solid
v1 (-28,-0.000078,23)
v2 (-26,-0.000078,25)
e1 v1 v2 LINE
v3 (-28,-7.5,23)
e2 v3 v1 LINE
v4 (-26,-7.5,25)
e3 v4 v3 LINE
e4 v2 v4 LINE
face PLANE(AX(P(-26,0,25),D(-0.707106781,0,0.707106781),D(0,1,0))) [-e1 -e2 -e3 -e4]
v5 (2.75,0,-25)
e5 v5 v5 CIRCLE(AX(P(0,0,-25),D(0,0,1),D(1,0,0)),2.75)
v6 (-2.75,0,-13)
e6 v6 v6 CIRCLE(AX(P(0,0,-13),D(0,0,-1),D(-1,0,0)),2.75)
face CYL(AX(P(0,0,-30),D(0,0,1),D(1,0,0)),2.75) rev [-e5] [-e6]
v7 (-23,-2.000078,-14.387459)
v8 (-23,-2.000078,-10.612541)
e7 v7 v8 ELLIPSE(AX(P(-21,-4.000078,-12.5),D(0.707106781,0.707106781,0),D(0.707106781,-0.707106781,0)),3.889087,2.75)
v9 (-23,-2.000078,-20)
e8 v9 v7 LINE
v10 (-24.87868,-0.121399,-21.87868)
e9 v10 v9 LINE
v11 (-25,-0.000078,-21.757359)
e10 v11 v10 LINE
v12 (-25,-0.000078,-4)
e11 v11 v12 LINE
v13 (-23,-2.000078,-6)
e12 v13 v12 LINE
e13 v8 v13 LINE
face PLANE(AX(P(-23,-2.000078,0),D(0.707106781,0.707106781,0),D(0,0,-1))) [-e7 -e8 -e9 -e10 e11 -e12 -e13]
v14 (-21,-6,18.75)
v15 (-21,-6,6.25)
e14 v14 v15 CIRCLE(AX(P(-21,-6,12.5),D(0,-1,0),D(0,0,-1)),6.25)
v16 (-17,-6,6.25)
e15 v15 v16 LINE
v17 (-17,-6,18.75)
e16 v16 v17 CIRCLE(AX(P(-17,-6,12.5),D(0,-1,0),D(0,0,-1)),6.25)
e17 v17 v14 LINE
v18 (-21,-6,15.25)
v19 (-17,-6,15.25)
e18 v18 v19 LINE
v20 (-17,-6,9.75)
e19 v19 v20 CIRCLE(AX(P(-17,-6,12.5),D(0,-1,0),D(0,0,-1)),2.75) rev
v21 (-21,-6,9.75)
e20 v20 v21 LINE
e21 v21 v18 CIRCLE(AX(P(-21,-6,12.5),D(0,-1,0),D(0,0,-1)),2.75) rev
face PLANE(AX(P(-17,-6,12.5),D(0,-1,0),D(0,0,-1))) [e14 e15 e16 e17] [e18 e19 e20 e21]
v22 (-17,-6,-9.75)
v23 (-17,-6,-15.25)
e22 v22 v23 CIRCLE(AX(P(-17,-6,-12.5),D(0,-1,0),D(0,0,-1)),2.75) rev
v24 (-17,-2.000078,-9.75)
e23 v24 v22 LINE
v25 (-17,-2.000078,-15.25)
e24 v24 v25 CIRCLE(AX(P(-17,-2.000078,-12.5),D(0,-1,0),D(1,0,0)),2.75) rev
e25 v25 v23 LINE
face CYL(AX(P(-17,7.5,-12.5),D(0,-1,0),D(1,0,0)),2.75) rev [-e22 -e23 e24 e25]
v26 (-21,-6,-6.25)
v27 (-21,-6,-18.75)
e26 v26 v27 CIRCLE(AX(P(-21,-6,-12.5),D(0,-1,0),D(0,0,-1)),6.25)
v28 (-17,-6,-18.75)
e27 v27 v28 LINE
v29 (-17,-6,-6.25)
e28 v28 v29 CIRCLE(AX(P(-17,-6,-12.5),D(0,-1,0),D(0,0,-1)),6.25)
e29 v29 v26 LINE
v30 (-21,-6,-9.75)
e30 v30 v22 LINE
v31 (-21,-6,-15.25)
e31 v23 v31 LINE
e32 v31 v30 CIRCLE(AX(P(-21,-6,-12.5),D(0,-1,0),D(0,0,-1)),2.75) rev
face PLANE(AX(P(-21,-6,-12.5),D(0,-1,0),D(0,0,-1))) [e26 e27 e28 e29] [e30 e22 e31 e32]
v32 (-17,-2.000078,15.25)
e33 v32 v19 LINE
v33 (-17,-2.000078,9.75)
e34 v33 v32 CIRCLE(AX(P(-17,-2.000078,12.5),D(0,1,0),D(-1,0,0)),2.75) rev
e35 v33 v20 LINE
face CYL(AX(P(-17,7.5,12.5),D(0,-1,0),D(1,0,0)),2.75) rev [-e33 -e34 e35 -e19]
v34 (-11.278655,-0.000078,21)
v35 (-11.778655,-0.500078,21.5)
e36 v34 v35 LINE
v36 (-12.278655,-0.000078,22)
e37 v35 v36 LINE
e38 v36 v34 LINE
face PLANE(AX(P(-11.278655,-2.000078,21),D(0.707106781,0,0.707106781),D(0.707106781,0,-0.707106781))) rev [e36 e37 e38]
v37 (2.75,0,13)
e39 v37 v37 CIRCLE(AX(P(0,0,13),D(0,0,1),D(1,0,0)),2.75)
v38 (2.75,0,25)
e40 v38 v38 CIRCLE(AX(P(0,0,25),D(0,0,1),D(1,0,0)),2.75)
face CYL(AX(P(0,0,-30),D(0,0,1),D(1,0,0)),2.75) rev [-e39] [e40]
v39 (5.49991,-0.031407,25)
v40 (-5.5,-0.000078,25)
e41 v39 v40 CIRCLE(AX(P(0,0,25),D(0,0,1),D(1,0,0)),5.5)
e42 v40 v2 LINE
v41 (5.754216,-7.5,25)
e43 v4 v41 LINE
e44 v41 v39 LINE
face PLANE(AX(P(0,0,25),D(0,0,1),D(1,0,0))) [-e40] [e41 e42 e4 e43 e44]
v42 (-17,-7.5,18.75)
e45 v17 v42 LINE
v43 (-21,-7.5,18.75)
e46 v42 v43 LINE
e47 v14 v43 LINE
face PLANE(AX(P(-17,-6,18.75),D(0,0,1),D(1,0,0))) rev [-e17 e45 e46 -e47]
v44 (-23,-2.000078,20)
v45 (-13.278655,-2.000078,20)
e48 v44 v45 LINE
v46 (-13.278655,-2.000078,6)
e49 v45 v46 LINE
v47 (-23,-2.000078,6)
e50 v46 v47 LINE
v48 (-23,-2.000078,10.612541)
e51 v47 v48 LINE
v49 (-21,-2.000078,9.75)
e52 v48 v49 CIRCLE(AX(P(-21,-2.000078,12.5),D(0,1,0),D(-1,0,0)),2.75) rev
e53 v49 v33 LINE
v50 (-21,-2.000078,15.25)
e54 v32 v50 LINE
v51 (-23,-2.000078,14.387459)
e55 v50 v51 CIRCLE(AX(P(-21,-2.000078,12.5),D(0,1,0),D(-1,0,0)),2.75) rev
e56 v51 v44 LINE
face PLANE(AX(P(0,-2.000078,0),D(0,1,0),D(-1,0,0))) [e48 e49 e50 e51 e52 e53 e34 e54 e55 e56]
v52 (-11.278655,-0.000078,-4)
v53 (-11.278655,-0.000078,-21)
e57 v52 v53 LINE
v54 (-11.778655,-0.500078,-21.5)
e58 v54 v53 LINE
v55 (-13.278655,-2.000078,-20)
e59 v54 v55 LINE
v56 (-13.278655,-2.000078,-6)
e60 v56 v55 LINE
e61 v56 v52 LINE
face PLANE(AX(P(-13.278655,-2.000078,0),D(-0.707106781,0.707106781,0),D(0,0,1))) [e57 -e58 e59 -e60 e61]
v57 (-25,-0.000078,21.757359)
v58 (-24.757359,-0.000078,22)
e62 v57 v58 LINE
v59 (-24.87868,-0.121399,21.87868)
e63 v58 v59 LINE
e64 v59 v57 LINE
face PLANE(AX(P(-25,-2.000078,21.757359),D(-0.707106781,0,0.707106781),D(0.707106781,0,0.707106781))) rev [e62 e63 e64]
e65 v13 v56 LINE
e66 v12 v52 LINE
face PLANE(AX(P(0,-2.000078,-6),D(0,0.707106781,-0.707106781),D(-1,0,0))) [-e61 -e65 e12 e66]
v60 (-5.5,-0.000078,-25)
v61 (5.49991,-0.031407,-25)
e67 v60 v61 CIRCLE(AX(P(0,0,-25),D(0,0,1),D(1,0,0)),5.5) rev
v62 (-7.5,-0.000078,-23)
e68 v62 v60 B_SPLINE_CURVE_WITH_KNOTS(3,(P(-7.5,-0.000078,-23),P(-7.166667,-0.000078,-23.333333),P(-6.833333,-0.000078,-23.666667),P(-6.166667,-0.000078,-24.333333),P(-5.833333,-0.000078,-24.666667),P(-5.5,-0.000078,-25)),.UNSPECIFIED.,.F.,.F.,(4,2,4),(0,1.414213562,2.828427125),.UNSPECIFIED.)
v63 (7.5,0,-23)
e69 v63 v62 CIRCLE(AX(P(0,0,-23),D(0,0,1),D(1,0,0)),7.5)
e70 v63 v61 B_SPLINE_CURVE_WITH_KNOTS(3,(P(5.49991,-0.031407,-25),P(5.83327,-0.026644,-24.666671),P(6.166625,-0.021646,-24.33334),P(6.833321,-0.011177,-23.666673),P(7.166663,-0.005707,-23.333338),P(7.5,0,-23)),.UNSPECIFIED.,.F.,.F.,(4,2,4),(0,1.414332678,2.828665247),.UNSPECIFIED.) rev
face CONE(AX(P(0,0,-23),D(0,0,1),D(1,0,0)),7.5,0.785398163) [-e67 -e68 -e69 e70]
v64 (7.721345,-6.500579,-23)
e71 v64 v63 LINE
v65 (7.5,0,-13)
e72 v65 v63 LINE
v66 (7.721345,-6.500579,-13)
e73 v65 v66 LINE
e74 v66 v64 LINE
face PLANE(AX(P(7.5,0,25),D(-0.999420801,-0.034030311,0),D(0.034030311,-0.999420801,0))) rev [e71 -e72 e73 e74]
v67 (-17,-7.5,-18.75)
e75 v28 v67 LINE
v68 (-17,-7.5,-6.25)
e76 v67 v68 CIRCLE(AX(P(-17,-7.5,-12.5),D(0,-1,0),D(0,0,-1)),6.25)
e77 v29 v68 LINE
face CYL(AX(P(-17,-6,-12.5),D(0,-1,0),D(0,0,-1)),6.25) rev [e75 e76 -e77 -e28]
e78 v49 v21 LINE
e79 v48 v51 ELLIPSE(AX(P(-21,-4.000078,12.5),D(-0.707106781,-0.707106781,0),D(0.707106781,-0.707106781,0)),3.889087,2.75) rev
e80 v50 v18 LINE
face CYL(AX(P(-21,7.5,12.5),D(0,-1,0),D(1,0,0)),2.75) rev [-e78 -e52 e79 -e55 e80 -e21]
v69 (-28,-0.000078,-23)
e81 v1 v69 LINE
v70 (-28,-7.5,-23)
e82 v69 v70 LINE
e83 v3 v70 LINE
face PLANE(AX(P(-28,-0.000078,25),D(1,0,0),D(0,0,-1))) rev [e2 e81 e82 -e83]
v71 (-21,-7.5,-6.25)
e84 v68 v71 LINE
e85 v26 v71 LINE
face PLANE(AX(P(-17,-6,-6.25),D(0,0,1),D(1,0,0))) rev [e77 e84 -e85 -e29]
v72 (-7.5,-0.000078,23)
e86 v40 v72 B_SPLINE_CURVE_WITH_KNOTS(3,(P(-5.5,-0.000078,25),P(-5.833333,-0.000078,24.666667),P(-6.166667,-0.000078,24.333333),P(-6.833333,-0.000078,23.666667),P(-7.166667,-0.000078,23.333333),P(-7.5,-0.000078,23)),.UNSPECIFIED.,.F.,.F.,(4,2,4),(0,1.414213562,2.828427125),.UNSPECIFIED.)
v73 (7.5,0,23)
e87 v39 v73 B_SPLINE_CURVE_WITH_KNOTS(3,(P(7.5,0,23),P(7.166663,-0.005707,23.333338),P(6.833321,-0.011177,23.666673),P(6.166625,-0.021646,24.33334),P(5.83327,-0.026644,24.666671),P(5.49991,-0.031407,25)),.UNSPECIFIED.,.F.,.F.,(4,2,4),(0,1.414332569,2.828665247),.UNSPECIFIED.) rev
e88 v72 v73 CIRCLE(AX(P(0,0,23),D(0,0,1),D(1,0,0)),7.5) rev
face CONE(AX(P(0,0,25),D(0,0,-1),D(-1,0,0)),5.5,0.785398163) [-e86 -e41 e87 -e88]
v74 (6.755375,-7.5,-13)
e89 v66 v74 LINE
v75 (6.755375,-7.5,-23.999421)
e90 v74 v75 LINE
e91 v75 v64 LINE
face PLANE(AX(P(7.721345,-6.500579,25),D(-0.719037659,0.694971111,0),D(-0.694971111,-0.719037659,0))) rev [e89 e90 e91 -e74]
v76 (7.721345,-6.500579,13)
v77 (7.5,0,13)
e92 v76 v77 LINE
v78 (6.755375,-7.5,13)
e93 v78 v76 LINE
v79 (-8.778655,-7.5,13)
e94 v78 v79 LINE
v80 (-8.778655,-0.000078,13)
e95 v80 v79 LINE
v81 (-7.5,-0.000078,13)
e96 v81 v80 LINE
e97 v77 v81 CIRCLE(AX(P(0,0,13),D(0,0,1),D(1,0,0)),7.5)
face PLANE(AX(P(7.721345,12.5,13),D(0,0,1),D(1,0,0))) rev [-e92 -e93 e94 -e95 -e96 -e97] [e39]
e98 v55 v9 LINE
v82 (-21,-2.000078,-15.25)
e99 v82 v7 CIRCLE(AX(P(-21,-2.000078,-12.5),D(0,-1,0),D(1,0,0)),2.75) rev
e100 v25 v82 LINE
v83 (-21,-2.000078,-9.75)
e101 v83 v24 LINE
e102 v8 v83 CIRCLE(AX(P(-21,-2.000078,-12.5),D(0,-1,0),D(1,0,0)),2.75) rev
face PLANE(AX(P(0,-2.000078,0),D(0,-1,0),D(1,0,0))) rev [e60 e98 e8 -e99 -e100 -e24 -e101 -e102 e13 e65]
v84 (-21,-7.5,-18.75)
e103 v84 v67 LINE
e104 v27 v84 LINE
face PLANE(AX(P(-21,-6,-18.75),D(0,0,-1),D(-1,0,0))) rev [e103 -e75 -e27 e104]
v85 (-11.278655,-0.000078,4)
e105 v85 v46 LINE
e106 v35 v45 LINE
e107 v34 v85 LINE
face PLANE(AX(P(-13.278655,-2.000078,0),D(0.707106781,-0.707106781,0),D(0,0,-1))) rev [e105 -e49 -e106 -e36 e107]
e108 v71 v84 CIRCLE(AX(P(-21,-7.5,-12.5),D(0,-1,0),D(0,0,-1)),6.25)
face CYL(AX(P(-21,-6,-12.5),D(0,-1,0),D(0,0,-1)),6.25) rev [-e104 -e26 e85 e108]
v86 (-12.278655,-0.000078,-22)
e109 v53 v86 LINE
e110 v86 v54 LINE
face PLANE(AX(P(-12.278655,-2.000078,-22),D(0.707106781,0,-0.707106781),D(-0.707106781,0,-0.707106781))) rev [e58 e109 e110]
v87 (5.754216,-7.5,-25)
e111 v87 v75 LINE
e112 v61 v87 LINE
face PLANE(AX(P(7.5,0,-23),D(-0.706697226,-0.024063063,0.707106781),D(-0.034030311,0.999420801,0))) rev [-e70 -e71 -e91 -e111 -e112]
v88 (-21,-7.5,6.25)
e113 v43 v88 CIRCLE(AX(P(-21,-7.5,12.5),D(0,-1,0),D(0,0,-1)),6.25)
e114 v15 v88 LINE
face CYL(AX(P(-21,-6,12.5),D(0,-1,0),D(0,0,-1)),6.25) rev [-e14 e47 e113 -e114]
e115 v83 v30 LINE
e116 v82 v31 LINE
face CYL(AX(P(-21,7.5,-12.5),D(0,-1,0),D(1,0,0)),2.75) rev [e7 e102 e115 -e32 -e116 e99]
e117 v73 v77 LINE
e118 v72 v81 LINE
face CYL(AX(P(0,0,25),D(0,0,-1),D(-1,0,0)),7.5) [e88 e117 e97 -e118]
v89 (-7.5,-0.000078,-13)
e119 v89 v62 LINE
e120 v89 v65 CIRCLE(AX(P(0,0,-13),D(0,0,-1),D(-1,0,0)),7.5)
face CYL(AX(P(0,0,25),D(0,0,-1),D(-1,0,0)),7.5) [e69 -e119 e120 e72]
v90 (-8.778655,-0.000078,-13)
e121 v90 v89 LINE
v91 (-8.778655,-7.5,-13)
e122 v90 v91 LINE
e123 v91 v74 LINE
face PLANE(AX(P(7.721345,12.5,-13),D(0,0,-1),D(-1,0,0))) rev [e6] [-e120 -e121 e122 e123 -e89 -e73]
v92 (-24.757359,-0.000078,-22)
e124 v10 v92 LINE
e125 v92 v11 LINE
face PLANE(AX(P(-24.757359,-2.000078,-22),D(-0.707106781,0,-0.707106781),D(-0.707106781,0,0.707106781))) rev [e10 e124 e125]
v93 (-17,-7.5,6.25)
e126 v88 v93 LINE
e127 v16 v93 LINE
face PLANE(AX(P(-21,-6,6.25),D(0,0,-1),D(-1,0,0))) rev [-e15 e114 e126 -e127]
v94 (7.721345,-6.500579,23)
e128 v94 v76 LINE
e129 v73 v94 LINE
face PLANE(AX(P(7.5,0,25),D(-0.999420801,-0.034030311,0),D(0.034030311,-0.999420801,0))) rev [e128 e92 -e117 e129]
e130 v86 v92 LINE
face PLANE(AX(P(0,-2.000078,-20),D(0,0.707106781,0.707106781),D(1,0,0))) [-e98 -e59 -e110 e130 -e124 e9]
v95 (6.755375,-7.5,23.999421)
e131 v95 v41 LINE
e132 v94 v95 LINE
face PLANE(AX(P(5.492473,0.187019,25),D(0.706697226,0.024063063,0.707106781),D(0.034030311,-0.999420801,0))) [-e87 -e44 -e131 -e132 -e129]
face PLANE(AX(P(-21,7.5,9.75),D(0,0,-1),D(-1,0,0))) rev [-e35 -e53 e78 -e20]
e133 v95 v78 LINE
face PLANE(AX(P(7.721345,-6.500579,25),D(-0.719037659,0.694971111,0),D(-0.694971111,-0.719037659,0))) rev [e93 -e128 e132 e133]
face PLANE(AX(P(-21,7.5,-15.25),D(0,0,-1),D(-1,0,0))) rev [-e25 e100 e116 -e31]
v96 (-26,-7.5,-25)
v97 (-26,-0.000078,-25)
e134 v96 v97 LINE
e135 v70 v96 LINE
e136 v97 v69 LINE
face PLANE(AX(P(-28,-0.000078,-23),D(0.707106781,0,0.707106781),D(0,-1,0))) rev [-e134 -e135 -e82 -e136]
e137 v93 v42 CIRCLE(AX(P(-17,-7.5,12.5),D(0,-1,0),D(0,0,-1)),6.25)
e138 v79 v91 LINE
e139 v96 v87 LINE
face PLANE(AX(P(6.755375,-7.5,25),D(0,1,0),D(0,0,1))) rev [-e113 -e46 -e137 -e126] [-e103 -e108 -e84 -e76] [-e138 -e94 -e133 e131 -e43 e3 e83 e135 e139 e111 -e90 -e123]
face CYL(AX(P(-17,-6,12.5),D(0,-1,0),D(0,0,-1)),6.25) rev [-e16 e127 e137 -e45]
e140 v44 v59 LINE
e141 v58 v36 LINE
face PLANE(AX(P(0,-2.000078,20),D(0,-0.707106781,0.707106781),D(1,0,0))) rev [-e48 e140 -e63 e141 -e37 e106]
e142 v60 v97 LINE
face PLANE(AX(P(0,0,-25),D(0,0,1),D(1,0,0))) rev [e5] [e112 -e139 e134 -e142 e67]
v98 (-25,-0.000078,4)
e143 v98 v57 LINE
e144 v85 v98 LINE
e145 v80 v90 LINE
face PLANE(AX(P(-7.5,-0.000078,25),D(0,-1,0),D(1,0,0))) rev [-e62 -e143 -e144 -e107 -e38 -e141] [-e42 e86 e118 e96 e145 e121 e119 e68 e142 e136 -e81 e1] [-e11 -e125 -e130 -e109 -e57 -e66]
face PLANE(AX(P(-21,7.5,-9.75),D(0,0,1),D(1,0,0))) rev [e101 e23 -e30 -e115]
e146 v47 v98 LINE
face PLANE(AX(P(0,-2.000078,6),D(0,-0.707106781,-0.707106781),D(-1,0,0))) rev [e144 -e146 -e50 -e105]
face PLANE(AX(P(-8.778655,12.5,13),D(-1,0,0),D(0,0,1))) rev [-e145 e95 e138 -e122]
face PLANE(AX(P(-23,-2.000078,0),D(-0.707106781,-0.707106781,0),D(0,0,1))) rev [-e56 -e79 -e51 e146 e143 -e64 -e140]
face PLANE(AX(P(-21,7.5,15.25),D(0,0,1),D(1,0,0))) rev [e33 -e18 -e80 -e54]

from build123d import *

# Parameters (mm, degrees)
BOSS_EXTRUDE1_DEPTH = 25
MOUNT_HOLES_DEPTH   = 41.422765863
SKETCH7_W           = 16.5
SKETCH7_H           = 26
CUT_PART_DEPTH      = 20
AXIS_R              = 2.75
CUT_EXTRUDE3_DEPTH  = 30
CUT_EXTRUDE4_DEPTH  = 1.5
CUT_EXTRUDE5_DEPTH  = 2
CHAMFER2_SIZE       = 2


with BuildPart() as part:
    # contour → Boss-Extrude1 (new, symmetric)
    with BuildSketch(Plane.XY):
        with BuildLine():
            Line((7.5, 0), (7.721344931, -6.500579199))
            Line((7.721344931, -6.500579199), (6.755375242, -7.5))
            Line((6.755375242, -7.5), (0, -7.5))
            Line((0, -7.5), (-28, -7.5))
            Line((-28, -7.5), (-28, -7.827e-05))
            Line((-28, -7.827e-05), (-7.5, -7.827e-05))
            ThreePointArc((-7.5, -7.827e-05), (-3.9135e-05, 7.5), (7.5, 0))
        make_face()
    extrude(amount=BOSS_EXTRUDE1_DEPTH, both=True)

    # Sketch6 → mount-holes (cut, through all)
    with BuildSketch(Plane.XZ.offset(7.5)):
        with BuildLine():
            Line((-21, 15.25), (-17, 15.25))
            ThreePointArc((-17, 15.25), (-14.25, 12.5), (-17, 9.75))
            Line((-17, 9.75), (-21, 9.75))
            ThreePointArc((-21, 9.75), (-23.75, 12.5), (-21, 15.25))
        make_face()
        with BuildLine():
            Line((-21, -9.75), (-17, -9.75))
            ThreePointArc((-17, -9.75), (-14.25, -12.5), (-17, -15.25))
            Line((-17, -15.25), (-21, -15.25))
            ThreePointArc((-21, -15.25), (-23.75, -12.5), (-21, -9.75))
        make_face()
    extrude(amount=-MOUNT_HOLES_DEPTH, mode=Mode.SUBTRACT)

    # Sketch7 → cut-part (cut)
    with BuildSketch(Plane.XZ.offset(7.5)):
        with Locations((-0.528655069, 0)):
            Rectangle(SKETCH7_W, SKETCH7_H)
    extrude(amount=-CUT_PART_DEPTH, mode=Mode.SUBTRACT)

    # axis → Cut-Extrude3 (cut, symmetric)
    with BuildSketch(Plane.XY):
        Circle(AXIS_R)
    extrude(amount=CUT_EXTRUDE3_DEPTH, both=True, mode=Mode.SUBTRACT)

    # Sketch9 → Cut-Extrude4 (cut)
    with BuildSketch(Plane.XZ.offset(7.5)):
        with BuildLine():
            Line((-17, 18.75), (-21, 18.75))
            ThreePointArc((-21, 18.75), (-27.25, 12.5), (-21, 6.25))
            Line((-21, 6.25), (-17, 6.25))
            ThreePointArc((-17, 6.25), (-10.75, 12.5), (-17, 18.75))
        make_face()
        with BuildLine():
            Line((-21, -18.75), (-17, -18.75))
            ThreePointArc((-17, -18.75), (-10.75, -12.5), (-17, -6.25))
            Line((-17, -6.25), (-21, -6.25))
            ThreePointArc((-21, -6.25), (-27.25, -12.5), (-21, -18.75))
        make_face()
    extrude(amount=-CUT_EXTRUDE4_DEPTH, mode=Mode.SUBTRACT)

    # Chamfer1
    # the kernel refuses this chamfer: 2 mm, written as the material it takes off along each edge
    with BuildSketch(Plane(origin=(7.324969659, 5.140386945, -25), x_dir=(0.027479951033163995, 0.0009356932186842305, 0.9996219169112968), z_dir=(0.03403031050568426, -0.9994208012478462, 0))) as chamfer1_piece_1_section:
        with BuildLine():
            Line((2.05734639, 0), (-0.11309431, 2.054235587))
            Line((-0.11309431, 2.054235587), (-0.153079186, 2.053135752))
            ThreePointArc((-0.153079186, 2.053135752), (-0.068258454, 1.026795659), (-0.039984877, -0.001099835))
            Line((-0.039984877, -0.001099835), (0.001099835, -0.039984877))
            ThreePointArc((0.001099835, -0.039984877), (1.028995329, -0.011711299), (2.058446225, -0.039984877))
            Line((2.058446225, -0.039984877), (2.05734639, 0))
        make_face()
    chamfer1_piece_1 = extrude(amount=16.79107846, mode=Mode.PRIVATE)
    chamfer1_piece_1 = split(chamfer1_piece_1, bisect_by=Plane(origin=(7.719880972, -6.502093854, -23.313005801), z_dir=(-0.7190376591339585, 0.6949711107284657, 0)), keep=Keep.TOP, mode=Mode.PRIVATE)
    add(chamfer1_piece_1, mode=Mode.SUBTRACT)
    with BuildSketch(Plane(origin=(7.324969659, 5.140386945, 25), x_dir=(-0.9990429371443961, -0.03401744422077874, 0.027495876610585647), z_dir=(0.03403031050568426, -0.9994208012478462, 0))) as chamfer1_piece_2_section:
        with BuildLine():
            Line((2.05734639, 0), (-0.11309431, 2.054235587))
            Line((-0.11309431, 2.054235587), (-0.153079186, 2.053135752))
            ThreePointArc((-0.153079186, 2.053135752), (-0.068258454, 1.026795659), (-0.039984877, -0.001099835))
            Line((-0.039984877, -0.001099835), (0.001099835, -0.039984877))
            ThreePointArc((0.001099835, -0.039984877), (1.028995329, -0.011711299), (2.058446225, -0.039984877))
            Line((2.058446225, -0.039984877), (2.05734639, 0))
        make_face()
    chamfer1_piece_2 = extrude(amount=16.79107846, mode=Mode.PRIVATE)
    chamfer1_piece_2 = split(chamfer1_piece_2, bisect_by=Plane(origin=(10.54505629, -3.579083939, 24.461957422), z_dir=(-0.7190376591339585, 0.6949711107284657, 0)), keep=Keep.TOP, mode=Mode.PRIVATE)
    add(chamfer1_piece_2, mode=Mode.SUBTRACT)
    with BuildSketch(Plane(origin=(-28, -7.5, -25), x_dir=(0.9996219169112968, 0, -0.027495876610585647), z_dir=(0, 1, 0)), Plane(origin=(-28, -7.5, 25), x_dir=(-0.027495876610585647, 0, -0.9996219169112968), z_dir=(0, 1, 0))) as chamfer1_piece_3:
        with BuildLine():
            Line((2.05734639, 0), (-0.11309431, -2.054235587))
            Line((-0.11309431, -2.054235587), (-0.153079186, -2.053135752))
            ThreePointArc((-0.153079186, -2.053135752), (-0.068258454, -1.026795659), (-0.039984877, 0.001099835))
            Line((-0.039984877, 0.001099835), (0.001099835, 0.039984877))
            ThreePointArc((0.001099835, 0.039984877), (1.028995329, 0.011711299), (2.058446225, 0.039984877))
            Line((2.058446225, 0.039984877), (2.05734639, 0))
        make_face()
    extrude(amount=7.49992173, mode=Mode.SUBTRACT)
    with BuildSketch(Plane(origin=(0, 0, -25), x_dir=(-0.7732184624570568, -0.6341397395807529, 0), z_dir=(0.6341397395807529, -0.7732184624570568, 0))) as chamfer1_piece_4_section:
        with BuildLine():
            Line((7.556568542, -2.056568542), (5.443431458, 0.056568542))
            Line((5.443431458, 0.056568542), (5.443431458, 0.096568542))
            ThreePointArc((5.443431458, 0.096568542), (6.471715729, 0.04), (7.5, 0.04))
            Line((7.5, 0.04), (7.54, 0))
            ThreePointArc((7.54, 0), (7.54, -1.028284271), (7.596568542, -2.056568542))
            Line((7.596568542, -2.056568542), (7.556568542, -2.056568542))
        make_face()
    chamfer1_piece_4 = revolve(axis=Axis((0, 0, -25), (0, 0, -1)), revolution_arc=258.711821509, mode=Mode.PRIVATE)
    chamfer1_piece_4 = split(chamfer1_piece_4, bisect_by=Plane(origin=(0, -7.827e-05, -24.025554596), z_dir=(0, 1, 0)), keep=Keep.TOP, mode=Mode.PRIVATE)
    chamfer1_piece_4 = split(chamfer1_piece_4, bisect_by=Plane(origin=(7.269376506, 6.773077101, -24.025554596), z_dir=(-0.9994208012478462, -0.03403031050568426, 0)), keep=Keep.TOP, mode=Mode.PRIVATE)
    add(chamfer1_piece_4, mode=Mode.SUBTRACT)
    with BuildSketch(Plane(origin=(0, 0, 25), x_dir=(-0.7732184624570568, -0.6341397395807529, 0), z_dir=(0.6341397395807529, -0.7732184624570568, 0))) as chamfer1_piece_5_section:
        with BuildLine():
            Line((5.443431458, -0.056568542), (7.556568542, 2.056568542))
            Line((7.556568542, 2.056568542), (7.596568542, 2.056568542))
            ThreePointArc((7.596568542, 2.056568542), (7.54, 1.028284271), (7.54, 0))
            Line((7.54, 0), (7.5, -0.04))
            ThreePointArc((7.5, -0.04), (6.471715729, -0.04), (5.443431458, -0.096568542))
            Line((5.443431458, -0.096568542), (5.443431458, -0.056568542))
        make_face()
    chamfer1_piece_5 = revolve(axis=Axis((0, 0, 25), (0, 0, -1)), revolution_arc=258.711821509, mode=Mode.PRIVATE)
    chamfer1_piece_5 = split(chamfer1_piece_5, bisect_by=Plane(origin=(0, -7.827e-05, 24.025554599), z_dir=(0, 1, 0)), keep=Keep.TOP, mode=Mode.PRIVATE)
    chamfer1_piece_5 = split(chamfer1_piece_5, bisect_by=Plane(origin=(7.269376506, 6.773077103, 24.025554599), z_dir=(-0.9994208012478462, -0.03403031050568426, 0)), keep=Keep.TOP, mode=Mode.PRIVATE)
    add(chamfer1_piece_5, mode=Mode.SUBTRACT)

    # Sketch10 → Cut-Extrude5 (cut)
    with BuildSketch(Plane(origin=(0, -7.827e-05, 0), x_dir=(1, 0, 0), z_dir=(0, 1, 0))):
        Polygon((-11.278655069, 4), (-25, 4), (-25, 21.757359313), (-24.757359313, 22), (-12.278655069, 22), (-11.278655069, 21), align=None)
        Polygon((-11.278655069, -4), (-25, -4), (-25, -21.757359313), (-24.757359313, -22), (-12.278655069, -22), (-11.278655069, -21), align=None)
    extrude(amount=-CUT_EXTRUDE5_DEPTH, mode=Mode.SUBTRACT)

    # Chamfer2
    # the kernel refuses this chamfer: 2 mm, written as the material it adds along each edge
    with BuildSketch(Plane(origin=(-29.900725289, -2.00007827, 22), x_dir=(0, 0.9996219169112968, 0.02749587661058563), z_dir=(1, 0, 0))) as chamfer2_piece_1_section:
        Polygon((CHAMFER2_SIZE * 0.999621916911, -CHAMFER2_SIZE * 0.0274958766106), (-CHAMFER2_SIZE * 0.0274958766106, -CHAMFER2_SIZE * 0.999621916911), (0, 0), align=None)
    chamfer2_piece_1 = extrude(amount=22.765436196, mode=Mode.PRIVATE)
    chamfer2_piece_1 = split(chamfer2_piece_1, bisect_by=Plane(origin=(-25, -1.339790295, 21.320575951), z_dir=(1, 0, 0)), keep=Keep.TOP, mode=Mode.PRIVATE)
    add(chamfer2_piece_1)
    with BuildSketch(Plane(origin=(-25, -2.00007827, 1.143365976), x_dir=(-0.02749587661058563, 0.9996219169112968, 0), z_dir=(0, 0, -1))) as chamfer2_piece_2_section:
        Polygon((CHAMFER2_SIZE * 0.999621916911, CHAMFER2_SIZE * 0.0274958766106), (-CHAMFER2_SIZE * 0.0274958766106, CHAMFER2_SIZE * 0.999621916911), (0, 0), align=None)
    chamfer2_piece_2 = extrude(amount=28.044091265, mode=Mode.PRIVATE)
    chamfer2_piece_2 = split(chamfer2_piece_2, bisect_by=Plane(origin=(-24.347473985, -1.326341277, -22), z_dir=(0, 0, 1)), keep=Keep.TOP, mode=Mode.PRIVATE)
    chamfer2_piece_2 = chamfer2_piece_2 - Plane(origin=(-21, -1.326341277, -12.5), x_dir=(0, 0, -1), z_dir=(0, -1, 0)) * Cylinder(2.75, 65, mode=Mode.PRIVATE)
    add(chamfer2_piece_2)
    with BuildSketch(Plane(origin=(-29.900725289, -2.00007827, -22), x_dir=(1.7831818563715163e-15, 0.9996219169112968, -0.02749587661058563), z_dir=(1, 0, 0))) as chamfer2_piece_3_section:
        Polygon((CHAMFER2_SIZE * 0.999621916911, CHAMFER2_SIZE * 0.0274958766106), (-CHAMFER2_SIZE * 0.0274958766106, CHAMFER2_SIZE * 0.999621916911), (0, 0), align=None)
    chamfer2_piece_3 = extrude(amount=22.765436196, mode=Mode.PRIVATE)
    chamfer2_piece_3 = split(chamfer2_piece_3, bisect_by=Plane(origin=(-21.883009307, -1.339790295, -24.874350006), z_dir=(0.7071067811864957, 0, 0.7071067811865993)), keep=Keep.TOP, mode=Mode.PRIVATE)
    add(chamfer2_piece_3)
    with BuildSketch(Plane(origin=(-11.278655069, -2.00007827, -26.143365976), x_dir=(0.027495876610586494, 0.9996219169112968, 0), z_dir=(0, 0, 1))) as chamfer2_piece_4_section:
        Polygon((CHAMFER2_SIZE * 0.999621916911, CHAMFER2_SIZE * 0.0274958766106), (-CHAMFER2_SIZE * 0.0274958766106, CHAMFER2_SIZE * 0.999621916911), (0, 0), align=None)
    chamfer2_piece_4 = extrude(amount=27.286731952, mode=Mode.PRIVATE)
    chamfer2_piece_4 = split(chamfer2_piece_4, bisect_by=Plane(origin=(-7.513844642, -1.337755995, -17.235189573), z_dir=(-0.707106781186572, 0, 0.707106781186523)), keep=Keep.TOP, mode=Mode.PRIVATE)
    add(chamfer2_piece_4)
    with BuildSketch(Plane(origin=(-11.278655069, -2.00007827, -4), x_dir=(0, 0.9996219169112968, 0.027495876610586275), z_dir=(-1, 0, 0))) as chamfer2_piece_5:
        Polygon((CHAMFER2_SIZE * 0.999621916911, CHAMFER2_SIZE * 0.0274958766106), (-CHAMFER2_SIZE * 0.0274958766106, CHAMFER2_SIZE * 0.999621916911), (0, 0), align=None)
    extrude(amount=13.721344931)
    with BuildSketch(Plane(origin=(-25, -2.00007827, -1.143365976), x_dir=(-0.02749587661058563, 0.9996219169112968, 0), z_dir=(0, 0, 1))) as chamfer2_piece_6_section:
        Polygon((CHAMFER2_SIZE * 0.999621916911, -CHAMFER2_SIZE * 0.0274958766106), (-CHAMFER2_SIZE * 0.0274958766106, -CHAMFER2_SIZE * 0.999621916911), (0, 0), align=None)
    chamfer2_piece_6 = extrude(amount=28.044091265, mode=Mode.PRIVATE)
    chamfer2_piece_6 = split(chamfer2_piece_6, bisect_by=Plane(origin=(-29.055362029, -1.326341277, 17.701997284), z_dir=(0.7071067811865476, 0, -0.7071067811865476)), keep=Keep.TOP, mode=Mode.PRIVATE)
    chamfer2_piece_6 = chamfer2_piece_6 - Plane(origin=(-21, -1.326341277, 12.5), x_dir=(0, 0, -1), z_dir=(0, -1, 0)) * Cylinder(2.75, 65, mode=Mode.PRIVATE)
    add(chamfer2_piece_6)
    with BuildSketch(Plane(origin=(-11.278655069, -2.00007827, 4), x_dir=(0, 0.9996219169112968, -0.027495876610586275), z_dir=(-1, 0, 0))) as chamfer2_piece_7:
        Polygon((CHAMFER2_SIZE * 0.999621916911, -CHAMFER2_SIZE * 0.0274958766106), (-CHAMFER2_SIZE * 0.0274958766106, -CHAMFER2_SIZE * 0.999621916911), (0, 0), align=None)
    extrude(amount=13.721344931)
    with BuildSketch(Plane(origin=(-11.278655069, -2.00007827, 26.143365976), x_dir=(0.027495876610586494, 0.9996219169112968, 0), z_dir=(0, 0, -1))) as chamfer2_piece_8_section:
        Polygon((CHAMFER2_SIZE * 0.999621916911, -CHAMFER2_SIZE * 0.0274958766106), (-CHAMFER2_SIZE * 0.0274958766106, -CHAMFER2_SIZE * 0.999621916911), (0, 0), align=None)
    chamfer2_piece_8 = extrude(amount=27.286731952, mode=Mode.PRIVATE)
    chamfer2_piece_8 = split(chamfer2_piece_8, bisect_by=Plane(origin=(-11.954010519, -1.337755995, 22), z_dir=(0, 0, -1)), keep=Keep.TOP, mode=Mode.PRIVATE)
    add(chamfer2_piece_8)


solid = part.part
